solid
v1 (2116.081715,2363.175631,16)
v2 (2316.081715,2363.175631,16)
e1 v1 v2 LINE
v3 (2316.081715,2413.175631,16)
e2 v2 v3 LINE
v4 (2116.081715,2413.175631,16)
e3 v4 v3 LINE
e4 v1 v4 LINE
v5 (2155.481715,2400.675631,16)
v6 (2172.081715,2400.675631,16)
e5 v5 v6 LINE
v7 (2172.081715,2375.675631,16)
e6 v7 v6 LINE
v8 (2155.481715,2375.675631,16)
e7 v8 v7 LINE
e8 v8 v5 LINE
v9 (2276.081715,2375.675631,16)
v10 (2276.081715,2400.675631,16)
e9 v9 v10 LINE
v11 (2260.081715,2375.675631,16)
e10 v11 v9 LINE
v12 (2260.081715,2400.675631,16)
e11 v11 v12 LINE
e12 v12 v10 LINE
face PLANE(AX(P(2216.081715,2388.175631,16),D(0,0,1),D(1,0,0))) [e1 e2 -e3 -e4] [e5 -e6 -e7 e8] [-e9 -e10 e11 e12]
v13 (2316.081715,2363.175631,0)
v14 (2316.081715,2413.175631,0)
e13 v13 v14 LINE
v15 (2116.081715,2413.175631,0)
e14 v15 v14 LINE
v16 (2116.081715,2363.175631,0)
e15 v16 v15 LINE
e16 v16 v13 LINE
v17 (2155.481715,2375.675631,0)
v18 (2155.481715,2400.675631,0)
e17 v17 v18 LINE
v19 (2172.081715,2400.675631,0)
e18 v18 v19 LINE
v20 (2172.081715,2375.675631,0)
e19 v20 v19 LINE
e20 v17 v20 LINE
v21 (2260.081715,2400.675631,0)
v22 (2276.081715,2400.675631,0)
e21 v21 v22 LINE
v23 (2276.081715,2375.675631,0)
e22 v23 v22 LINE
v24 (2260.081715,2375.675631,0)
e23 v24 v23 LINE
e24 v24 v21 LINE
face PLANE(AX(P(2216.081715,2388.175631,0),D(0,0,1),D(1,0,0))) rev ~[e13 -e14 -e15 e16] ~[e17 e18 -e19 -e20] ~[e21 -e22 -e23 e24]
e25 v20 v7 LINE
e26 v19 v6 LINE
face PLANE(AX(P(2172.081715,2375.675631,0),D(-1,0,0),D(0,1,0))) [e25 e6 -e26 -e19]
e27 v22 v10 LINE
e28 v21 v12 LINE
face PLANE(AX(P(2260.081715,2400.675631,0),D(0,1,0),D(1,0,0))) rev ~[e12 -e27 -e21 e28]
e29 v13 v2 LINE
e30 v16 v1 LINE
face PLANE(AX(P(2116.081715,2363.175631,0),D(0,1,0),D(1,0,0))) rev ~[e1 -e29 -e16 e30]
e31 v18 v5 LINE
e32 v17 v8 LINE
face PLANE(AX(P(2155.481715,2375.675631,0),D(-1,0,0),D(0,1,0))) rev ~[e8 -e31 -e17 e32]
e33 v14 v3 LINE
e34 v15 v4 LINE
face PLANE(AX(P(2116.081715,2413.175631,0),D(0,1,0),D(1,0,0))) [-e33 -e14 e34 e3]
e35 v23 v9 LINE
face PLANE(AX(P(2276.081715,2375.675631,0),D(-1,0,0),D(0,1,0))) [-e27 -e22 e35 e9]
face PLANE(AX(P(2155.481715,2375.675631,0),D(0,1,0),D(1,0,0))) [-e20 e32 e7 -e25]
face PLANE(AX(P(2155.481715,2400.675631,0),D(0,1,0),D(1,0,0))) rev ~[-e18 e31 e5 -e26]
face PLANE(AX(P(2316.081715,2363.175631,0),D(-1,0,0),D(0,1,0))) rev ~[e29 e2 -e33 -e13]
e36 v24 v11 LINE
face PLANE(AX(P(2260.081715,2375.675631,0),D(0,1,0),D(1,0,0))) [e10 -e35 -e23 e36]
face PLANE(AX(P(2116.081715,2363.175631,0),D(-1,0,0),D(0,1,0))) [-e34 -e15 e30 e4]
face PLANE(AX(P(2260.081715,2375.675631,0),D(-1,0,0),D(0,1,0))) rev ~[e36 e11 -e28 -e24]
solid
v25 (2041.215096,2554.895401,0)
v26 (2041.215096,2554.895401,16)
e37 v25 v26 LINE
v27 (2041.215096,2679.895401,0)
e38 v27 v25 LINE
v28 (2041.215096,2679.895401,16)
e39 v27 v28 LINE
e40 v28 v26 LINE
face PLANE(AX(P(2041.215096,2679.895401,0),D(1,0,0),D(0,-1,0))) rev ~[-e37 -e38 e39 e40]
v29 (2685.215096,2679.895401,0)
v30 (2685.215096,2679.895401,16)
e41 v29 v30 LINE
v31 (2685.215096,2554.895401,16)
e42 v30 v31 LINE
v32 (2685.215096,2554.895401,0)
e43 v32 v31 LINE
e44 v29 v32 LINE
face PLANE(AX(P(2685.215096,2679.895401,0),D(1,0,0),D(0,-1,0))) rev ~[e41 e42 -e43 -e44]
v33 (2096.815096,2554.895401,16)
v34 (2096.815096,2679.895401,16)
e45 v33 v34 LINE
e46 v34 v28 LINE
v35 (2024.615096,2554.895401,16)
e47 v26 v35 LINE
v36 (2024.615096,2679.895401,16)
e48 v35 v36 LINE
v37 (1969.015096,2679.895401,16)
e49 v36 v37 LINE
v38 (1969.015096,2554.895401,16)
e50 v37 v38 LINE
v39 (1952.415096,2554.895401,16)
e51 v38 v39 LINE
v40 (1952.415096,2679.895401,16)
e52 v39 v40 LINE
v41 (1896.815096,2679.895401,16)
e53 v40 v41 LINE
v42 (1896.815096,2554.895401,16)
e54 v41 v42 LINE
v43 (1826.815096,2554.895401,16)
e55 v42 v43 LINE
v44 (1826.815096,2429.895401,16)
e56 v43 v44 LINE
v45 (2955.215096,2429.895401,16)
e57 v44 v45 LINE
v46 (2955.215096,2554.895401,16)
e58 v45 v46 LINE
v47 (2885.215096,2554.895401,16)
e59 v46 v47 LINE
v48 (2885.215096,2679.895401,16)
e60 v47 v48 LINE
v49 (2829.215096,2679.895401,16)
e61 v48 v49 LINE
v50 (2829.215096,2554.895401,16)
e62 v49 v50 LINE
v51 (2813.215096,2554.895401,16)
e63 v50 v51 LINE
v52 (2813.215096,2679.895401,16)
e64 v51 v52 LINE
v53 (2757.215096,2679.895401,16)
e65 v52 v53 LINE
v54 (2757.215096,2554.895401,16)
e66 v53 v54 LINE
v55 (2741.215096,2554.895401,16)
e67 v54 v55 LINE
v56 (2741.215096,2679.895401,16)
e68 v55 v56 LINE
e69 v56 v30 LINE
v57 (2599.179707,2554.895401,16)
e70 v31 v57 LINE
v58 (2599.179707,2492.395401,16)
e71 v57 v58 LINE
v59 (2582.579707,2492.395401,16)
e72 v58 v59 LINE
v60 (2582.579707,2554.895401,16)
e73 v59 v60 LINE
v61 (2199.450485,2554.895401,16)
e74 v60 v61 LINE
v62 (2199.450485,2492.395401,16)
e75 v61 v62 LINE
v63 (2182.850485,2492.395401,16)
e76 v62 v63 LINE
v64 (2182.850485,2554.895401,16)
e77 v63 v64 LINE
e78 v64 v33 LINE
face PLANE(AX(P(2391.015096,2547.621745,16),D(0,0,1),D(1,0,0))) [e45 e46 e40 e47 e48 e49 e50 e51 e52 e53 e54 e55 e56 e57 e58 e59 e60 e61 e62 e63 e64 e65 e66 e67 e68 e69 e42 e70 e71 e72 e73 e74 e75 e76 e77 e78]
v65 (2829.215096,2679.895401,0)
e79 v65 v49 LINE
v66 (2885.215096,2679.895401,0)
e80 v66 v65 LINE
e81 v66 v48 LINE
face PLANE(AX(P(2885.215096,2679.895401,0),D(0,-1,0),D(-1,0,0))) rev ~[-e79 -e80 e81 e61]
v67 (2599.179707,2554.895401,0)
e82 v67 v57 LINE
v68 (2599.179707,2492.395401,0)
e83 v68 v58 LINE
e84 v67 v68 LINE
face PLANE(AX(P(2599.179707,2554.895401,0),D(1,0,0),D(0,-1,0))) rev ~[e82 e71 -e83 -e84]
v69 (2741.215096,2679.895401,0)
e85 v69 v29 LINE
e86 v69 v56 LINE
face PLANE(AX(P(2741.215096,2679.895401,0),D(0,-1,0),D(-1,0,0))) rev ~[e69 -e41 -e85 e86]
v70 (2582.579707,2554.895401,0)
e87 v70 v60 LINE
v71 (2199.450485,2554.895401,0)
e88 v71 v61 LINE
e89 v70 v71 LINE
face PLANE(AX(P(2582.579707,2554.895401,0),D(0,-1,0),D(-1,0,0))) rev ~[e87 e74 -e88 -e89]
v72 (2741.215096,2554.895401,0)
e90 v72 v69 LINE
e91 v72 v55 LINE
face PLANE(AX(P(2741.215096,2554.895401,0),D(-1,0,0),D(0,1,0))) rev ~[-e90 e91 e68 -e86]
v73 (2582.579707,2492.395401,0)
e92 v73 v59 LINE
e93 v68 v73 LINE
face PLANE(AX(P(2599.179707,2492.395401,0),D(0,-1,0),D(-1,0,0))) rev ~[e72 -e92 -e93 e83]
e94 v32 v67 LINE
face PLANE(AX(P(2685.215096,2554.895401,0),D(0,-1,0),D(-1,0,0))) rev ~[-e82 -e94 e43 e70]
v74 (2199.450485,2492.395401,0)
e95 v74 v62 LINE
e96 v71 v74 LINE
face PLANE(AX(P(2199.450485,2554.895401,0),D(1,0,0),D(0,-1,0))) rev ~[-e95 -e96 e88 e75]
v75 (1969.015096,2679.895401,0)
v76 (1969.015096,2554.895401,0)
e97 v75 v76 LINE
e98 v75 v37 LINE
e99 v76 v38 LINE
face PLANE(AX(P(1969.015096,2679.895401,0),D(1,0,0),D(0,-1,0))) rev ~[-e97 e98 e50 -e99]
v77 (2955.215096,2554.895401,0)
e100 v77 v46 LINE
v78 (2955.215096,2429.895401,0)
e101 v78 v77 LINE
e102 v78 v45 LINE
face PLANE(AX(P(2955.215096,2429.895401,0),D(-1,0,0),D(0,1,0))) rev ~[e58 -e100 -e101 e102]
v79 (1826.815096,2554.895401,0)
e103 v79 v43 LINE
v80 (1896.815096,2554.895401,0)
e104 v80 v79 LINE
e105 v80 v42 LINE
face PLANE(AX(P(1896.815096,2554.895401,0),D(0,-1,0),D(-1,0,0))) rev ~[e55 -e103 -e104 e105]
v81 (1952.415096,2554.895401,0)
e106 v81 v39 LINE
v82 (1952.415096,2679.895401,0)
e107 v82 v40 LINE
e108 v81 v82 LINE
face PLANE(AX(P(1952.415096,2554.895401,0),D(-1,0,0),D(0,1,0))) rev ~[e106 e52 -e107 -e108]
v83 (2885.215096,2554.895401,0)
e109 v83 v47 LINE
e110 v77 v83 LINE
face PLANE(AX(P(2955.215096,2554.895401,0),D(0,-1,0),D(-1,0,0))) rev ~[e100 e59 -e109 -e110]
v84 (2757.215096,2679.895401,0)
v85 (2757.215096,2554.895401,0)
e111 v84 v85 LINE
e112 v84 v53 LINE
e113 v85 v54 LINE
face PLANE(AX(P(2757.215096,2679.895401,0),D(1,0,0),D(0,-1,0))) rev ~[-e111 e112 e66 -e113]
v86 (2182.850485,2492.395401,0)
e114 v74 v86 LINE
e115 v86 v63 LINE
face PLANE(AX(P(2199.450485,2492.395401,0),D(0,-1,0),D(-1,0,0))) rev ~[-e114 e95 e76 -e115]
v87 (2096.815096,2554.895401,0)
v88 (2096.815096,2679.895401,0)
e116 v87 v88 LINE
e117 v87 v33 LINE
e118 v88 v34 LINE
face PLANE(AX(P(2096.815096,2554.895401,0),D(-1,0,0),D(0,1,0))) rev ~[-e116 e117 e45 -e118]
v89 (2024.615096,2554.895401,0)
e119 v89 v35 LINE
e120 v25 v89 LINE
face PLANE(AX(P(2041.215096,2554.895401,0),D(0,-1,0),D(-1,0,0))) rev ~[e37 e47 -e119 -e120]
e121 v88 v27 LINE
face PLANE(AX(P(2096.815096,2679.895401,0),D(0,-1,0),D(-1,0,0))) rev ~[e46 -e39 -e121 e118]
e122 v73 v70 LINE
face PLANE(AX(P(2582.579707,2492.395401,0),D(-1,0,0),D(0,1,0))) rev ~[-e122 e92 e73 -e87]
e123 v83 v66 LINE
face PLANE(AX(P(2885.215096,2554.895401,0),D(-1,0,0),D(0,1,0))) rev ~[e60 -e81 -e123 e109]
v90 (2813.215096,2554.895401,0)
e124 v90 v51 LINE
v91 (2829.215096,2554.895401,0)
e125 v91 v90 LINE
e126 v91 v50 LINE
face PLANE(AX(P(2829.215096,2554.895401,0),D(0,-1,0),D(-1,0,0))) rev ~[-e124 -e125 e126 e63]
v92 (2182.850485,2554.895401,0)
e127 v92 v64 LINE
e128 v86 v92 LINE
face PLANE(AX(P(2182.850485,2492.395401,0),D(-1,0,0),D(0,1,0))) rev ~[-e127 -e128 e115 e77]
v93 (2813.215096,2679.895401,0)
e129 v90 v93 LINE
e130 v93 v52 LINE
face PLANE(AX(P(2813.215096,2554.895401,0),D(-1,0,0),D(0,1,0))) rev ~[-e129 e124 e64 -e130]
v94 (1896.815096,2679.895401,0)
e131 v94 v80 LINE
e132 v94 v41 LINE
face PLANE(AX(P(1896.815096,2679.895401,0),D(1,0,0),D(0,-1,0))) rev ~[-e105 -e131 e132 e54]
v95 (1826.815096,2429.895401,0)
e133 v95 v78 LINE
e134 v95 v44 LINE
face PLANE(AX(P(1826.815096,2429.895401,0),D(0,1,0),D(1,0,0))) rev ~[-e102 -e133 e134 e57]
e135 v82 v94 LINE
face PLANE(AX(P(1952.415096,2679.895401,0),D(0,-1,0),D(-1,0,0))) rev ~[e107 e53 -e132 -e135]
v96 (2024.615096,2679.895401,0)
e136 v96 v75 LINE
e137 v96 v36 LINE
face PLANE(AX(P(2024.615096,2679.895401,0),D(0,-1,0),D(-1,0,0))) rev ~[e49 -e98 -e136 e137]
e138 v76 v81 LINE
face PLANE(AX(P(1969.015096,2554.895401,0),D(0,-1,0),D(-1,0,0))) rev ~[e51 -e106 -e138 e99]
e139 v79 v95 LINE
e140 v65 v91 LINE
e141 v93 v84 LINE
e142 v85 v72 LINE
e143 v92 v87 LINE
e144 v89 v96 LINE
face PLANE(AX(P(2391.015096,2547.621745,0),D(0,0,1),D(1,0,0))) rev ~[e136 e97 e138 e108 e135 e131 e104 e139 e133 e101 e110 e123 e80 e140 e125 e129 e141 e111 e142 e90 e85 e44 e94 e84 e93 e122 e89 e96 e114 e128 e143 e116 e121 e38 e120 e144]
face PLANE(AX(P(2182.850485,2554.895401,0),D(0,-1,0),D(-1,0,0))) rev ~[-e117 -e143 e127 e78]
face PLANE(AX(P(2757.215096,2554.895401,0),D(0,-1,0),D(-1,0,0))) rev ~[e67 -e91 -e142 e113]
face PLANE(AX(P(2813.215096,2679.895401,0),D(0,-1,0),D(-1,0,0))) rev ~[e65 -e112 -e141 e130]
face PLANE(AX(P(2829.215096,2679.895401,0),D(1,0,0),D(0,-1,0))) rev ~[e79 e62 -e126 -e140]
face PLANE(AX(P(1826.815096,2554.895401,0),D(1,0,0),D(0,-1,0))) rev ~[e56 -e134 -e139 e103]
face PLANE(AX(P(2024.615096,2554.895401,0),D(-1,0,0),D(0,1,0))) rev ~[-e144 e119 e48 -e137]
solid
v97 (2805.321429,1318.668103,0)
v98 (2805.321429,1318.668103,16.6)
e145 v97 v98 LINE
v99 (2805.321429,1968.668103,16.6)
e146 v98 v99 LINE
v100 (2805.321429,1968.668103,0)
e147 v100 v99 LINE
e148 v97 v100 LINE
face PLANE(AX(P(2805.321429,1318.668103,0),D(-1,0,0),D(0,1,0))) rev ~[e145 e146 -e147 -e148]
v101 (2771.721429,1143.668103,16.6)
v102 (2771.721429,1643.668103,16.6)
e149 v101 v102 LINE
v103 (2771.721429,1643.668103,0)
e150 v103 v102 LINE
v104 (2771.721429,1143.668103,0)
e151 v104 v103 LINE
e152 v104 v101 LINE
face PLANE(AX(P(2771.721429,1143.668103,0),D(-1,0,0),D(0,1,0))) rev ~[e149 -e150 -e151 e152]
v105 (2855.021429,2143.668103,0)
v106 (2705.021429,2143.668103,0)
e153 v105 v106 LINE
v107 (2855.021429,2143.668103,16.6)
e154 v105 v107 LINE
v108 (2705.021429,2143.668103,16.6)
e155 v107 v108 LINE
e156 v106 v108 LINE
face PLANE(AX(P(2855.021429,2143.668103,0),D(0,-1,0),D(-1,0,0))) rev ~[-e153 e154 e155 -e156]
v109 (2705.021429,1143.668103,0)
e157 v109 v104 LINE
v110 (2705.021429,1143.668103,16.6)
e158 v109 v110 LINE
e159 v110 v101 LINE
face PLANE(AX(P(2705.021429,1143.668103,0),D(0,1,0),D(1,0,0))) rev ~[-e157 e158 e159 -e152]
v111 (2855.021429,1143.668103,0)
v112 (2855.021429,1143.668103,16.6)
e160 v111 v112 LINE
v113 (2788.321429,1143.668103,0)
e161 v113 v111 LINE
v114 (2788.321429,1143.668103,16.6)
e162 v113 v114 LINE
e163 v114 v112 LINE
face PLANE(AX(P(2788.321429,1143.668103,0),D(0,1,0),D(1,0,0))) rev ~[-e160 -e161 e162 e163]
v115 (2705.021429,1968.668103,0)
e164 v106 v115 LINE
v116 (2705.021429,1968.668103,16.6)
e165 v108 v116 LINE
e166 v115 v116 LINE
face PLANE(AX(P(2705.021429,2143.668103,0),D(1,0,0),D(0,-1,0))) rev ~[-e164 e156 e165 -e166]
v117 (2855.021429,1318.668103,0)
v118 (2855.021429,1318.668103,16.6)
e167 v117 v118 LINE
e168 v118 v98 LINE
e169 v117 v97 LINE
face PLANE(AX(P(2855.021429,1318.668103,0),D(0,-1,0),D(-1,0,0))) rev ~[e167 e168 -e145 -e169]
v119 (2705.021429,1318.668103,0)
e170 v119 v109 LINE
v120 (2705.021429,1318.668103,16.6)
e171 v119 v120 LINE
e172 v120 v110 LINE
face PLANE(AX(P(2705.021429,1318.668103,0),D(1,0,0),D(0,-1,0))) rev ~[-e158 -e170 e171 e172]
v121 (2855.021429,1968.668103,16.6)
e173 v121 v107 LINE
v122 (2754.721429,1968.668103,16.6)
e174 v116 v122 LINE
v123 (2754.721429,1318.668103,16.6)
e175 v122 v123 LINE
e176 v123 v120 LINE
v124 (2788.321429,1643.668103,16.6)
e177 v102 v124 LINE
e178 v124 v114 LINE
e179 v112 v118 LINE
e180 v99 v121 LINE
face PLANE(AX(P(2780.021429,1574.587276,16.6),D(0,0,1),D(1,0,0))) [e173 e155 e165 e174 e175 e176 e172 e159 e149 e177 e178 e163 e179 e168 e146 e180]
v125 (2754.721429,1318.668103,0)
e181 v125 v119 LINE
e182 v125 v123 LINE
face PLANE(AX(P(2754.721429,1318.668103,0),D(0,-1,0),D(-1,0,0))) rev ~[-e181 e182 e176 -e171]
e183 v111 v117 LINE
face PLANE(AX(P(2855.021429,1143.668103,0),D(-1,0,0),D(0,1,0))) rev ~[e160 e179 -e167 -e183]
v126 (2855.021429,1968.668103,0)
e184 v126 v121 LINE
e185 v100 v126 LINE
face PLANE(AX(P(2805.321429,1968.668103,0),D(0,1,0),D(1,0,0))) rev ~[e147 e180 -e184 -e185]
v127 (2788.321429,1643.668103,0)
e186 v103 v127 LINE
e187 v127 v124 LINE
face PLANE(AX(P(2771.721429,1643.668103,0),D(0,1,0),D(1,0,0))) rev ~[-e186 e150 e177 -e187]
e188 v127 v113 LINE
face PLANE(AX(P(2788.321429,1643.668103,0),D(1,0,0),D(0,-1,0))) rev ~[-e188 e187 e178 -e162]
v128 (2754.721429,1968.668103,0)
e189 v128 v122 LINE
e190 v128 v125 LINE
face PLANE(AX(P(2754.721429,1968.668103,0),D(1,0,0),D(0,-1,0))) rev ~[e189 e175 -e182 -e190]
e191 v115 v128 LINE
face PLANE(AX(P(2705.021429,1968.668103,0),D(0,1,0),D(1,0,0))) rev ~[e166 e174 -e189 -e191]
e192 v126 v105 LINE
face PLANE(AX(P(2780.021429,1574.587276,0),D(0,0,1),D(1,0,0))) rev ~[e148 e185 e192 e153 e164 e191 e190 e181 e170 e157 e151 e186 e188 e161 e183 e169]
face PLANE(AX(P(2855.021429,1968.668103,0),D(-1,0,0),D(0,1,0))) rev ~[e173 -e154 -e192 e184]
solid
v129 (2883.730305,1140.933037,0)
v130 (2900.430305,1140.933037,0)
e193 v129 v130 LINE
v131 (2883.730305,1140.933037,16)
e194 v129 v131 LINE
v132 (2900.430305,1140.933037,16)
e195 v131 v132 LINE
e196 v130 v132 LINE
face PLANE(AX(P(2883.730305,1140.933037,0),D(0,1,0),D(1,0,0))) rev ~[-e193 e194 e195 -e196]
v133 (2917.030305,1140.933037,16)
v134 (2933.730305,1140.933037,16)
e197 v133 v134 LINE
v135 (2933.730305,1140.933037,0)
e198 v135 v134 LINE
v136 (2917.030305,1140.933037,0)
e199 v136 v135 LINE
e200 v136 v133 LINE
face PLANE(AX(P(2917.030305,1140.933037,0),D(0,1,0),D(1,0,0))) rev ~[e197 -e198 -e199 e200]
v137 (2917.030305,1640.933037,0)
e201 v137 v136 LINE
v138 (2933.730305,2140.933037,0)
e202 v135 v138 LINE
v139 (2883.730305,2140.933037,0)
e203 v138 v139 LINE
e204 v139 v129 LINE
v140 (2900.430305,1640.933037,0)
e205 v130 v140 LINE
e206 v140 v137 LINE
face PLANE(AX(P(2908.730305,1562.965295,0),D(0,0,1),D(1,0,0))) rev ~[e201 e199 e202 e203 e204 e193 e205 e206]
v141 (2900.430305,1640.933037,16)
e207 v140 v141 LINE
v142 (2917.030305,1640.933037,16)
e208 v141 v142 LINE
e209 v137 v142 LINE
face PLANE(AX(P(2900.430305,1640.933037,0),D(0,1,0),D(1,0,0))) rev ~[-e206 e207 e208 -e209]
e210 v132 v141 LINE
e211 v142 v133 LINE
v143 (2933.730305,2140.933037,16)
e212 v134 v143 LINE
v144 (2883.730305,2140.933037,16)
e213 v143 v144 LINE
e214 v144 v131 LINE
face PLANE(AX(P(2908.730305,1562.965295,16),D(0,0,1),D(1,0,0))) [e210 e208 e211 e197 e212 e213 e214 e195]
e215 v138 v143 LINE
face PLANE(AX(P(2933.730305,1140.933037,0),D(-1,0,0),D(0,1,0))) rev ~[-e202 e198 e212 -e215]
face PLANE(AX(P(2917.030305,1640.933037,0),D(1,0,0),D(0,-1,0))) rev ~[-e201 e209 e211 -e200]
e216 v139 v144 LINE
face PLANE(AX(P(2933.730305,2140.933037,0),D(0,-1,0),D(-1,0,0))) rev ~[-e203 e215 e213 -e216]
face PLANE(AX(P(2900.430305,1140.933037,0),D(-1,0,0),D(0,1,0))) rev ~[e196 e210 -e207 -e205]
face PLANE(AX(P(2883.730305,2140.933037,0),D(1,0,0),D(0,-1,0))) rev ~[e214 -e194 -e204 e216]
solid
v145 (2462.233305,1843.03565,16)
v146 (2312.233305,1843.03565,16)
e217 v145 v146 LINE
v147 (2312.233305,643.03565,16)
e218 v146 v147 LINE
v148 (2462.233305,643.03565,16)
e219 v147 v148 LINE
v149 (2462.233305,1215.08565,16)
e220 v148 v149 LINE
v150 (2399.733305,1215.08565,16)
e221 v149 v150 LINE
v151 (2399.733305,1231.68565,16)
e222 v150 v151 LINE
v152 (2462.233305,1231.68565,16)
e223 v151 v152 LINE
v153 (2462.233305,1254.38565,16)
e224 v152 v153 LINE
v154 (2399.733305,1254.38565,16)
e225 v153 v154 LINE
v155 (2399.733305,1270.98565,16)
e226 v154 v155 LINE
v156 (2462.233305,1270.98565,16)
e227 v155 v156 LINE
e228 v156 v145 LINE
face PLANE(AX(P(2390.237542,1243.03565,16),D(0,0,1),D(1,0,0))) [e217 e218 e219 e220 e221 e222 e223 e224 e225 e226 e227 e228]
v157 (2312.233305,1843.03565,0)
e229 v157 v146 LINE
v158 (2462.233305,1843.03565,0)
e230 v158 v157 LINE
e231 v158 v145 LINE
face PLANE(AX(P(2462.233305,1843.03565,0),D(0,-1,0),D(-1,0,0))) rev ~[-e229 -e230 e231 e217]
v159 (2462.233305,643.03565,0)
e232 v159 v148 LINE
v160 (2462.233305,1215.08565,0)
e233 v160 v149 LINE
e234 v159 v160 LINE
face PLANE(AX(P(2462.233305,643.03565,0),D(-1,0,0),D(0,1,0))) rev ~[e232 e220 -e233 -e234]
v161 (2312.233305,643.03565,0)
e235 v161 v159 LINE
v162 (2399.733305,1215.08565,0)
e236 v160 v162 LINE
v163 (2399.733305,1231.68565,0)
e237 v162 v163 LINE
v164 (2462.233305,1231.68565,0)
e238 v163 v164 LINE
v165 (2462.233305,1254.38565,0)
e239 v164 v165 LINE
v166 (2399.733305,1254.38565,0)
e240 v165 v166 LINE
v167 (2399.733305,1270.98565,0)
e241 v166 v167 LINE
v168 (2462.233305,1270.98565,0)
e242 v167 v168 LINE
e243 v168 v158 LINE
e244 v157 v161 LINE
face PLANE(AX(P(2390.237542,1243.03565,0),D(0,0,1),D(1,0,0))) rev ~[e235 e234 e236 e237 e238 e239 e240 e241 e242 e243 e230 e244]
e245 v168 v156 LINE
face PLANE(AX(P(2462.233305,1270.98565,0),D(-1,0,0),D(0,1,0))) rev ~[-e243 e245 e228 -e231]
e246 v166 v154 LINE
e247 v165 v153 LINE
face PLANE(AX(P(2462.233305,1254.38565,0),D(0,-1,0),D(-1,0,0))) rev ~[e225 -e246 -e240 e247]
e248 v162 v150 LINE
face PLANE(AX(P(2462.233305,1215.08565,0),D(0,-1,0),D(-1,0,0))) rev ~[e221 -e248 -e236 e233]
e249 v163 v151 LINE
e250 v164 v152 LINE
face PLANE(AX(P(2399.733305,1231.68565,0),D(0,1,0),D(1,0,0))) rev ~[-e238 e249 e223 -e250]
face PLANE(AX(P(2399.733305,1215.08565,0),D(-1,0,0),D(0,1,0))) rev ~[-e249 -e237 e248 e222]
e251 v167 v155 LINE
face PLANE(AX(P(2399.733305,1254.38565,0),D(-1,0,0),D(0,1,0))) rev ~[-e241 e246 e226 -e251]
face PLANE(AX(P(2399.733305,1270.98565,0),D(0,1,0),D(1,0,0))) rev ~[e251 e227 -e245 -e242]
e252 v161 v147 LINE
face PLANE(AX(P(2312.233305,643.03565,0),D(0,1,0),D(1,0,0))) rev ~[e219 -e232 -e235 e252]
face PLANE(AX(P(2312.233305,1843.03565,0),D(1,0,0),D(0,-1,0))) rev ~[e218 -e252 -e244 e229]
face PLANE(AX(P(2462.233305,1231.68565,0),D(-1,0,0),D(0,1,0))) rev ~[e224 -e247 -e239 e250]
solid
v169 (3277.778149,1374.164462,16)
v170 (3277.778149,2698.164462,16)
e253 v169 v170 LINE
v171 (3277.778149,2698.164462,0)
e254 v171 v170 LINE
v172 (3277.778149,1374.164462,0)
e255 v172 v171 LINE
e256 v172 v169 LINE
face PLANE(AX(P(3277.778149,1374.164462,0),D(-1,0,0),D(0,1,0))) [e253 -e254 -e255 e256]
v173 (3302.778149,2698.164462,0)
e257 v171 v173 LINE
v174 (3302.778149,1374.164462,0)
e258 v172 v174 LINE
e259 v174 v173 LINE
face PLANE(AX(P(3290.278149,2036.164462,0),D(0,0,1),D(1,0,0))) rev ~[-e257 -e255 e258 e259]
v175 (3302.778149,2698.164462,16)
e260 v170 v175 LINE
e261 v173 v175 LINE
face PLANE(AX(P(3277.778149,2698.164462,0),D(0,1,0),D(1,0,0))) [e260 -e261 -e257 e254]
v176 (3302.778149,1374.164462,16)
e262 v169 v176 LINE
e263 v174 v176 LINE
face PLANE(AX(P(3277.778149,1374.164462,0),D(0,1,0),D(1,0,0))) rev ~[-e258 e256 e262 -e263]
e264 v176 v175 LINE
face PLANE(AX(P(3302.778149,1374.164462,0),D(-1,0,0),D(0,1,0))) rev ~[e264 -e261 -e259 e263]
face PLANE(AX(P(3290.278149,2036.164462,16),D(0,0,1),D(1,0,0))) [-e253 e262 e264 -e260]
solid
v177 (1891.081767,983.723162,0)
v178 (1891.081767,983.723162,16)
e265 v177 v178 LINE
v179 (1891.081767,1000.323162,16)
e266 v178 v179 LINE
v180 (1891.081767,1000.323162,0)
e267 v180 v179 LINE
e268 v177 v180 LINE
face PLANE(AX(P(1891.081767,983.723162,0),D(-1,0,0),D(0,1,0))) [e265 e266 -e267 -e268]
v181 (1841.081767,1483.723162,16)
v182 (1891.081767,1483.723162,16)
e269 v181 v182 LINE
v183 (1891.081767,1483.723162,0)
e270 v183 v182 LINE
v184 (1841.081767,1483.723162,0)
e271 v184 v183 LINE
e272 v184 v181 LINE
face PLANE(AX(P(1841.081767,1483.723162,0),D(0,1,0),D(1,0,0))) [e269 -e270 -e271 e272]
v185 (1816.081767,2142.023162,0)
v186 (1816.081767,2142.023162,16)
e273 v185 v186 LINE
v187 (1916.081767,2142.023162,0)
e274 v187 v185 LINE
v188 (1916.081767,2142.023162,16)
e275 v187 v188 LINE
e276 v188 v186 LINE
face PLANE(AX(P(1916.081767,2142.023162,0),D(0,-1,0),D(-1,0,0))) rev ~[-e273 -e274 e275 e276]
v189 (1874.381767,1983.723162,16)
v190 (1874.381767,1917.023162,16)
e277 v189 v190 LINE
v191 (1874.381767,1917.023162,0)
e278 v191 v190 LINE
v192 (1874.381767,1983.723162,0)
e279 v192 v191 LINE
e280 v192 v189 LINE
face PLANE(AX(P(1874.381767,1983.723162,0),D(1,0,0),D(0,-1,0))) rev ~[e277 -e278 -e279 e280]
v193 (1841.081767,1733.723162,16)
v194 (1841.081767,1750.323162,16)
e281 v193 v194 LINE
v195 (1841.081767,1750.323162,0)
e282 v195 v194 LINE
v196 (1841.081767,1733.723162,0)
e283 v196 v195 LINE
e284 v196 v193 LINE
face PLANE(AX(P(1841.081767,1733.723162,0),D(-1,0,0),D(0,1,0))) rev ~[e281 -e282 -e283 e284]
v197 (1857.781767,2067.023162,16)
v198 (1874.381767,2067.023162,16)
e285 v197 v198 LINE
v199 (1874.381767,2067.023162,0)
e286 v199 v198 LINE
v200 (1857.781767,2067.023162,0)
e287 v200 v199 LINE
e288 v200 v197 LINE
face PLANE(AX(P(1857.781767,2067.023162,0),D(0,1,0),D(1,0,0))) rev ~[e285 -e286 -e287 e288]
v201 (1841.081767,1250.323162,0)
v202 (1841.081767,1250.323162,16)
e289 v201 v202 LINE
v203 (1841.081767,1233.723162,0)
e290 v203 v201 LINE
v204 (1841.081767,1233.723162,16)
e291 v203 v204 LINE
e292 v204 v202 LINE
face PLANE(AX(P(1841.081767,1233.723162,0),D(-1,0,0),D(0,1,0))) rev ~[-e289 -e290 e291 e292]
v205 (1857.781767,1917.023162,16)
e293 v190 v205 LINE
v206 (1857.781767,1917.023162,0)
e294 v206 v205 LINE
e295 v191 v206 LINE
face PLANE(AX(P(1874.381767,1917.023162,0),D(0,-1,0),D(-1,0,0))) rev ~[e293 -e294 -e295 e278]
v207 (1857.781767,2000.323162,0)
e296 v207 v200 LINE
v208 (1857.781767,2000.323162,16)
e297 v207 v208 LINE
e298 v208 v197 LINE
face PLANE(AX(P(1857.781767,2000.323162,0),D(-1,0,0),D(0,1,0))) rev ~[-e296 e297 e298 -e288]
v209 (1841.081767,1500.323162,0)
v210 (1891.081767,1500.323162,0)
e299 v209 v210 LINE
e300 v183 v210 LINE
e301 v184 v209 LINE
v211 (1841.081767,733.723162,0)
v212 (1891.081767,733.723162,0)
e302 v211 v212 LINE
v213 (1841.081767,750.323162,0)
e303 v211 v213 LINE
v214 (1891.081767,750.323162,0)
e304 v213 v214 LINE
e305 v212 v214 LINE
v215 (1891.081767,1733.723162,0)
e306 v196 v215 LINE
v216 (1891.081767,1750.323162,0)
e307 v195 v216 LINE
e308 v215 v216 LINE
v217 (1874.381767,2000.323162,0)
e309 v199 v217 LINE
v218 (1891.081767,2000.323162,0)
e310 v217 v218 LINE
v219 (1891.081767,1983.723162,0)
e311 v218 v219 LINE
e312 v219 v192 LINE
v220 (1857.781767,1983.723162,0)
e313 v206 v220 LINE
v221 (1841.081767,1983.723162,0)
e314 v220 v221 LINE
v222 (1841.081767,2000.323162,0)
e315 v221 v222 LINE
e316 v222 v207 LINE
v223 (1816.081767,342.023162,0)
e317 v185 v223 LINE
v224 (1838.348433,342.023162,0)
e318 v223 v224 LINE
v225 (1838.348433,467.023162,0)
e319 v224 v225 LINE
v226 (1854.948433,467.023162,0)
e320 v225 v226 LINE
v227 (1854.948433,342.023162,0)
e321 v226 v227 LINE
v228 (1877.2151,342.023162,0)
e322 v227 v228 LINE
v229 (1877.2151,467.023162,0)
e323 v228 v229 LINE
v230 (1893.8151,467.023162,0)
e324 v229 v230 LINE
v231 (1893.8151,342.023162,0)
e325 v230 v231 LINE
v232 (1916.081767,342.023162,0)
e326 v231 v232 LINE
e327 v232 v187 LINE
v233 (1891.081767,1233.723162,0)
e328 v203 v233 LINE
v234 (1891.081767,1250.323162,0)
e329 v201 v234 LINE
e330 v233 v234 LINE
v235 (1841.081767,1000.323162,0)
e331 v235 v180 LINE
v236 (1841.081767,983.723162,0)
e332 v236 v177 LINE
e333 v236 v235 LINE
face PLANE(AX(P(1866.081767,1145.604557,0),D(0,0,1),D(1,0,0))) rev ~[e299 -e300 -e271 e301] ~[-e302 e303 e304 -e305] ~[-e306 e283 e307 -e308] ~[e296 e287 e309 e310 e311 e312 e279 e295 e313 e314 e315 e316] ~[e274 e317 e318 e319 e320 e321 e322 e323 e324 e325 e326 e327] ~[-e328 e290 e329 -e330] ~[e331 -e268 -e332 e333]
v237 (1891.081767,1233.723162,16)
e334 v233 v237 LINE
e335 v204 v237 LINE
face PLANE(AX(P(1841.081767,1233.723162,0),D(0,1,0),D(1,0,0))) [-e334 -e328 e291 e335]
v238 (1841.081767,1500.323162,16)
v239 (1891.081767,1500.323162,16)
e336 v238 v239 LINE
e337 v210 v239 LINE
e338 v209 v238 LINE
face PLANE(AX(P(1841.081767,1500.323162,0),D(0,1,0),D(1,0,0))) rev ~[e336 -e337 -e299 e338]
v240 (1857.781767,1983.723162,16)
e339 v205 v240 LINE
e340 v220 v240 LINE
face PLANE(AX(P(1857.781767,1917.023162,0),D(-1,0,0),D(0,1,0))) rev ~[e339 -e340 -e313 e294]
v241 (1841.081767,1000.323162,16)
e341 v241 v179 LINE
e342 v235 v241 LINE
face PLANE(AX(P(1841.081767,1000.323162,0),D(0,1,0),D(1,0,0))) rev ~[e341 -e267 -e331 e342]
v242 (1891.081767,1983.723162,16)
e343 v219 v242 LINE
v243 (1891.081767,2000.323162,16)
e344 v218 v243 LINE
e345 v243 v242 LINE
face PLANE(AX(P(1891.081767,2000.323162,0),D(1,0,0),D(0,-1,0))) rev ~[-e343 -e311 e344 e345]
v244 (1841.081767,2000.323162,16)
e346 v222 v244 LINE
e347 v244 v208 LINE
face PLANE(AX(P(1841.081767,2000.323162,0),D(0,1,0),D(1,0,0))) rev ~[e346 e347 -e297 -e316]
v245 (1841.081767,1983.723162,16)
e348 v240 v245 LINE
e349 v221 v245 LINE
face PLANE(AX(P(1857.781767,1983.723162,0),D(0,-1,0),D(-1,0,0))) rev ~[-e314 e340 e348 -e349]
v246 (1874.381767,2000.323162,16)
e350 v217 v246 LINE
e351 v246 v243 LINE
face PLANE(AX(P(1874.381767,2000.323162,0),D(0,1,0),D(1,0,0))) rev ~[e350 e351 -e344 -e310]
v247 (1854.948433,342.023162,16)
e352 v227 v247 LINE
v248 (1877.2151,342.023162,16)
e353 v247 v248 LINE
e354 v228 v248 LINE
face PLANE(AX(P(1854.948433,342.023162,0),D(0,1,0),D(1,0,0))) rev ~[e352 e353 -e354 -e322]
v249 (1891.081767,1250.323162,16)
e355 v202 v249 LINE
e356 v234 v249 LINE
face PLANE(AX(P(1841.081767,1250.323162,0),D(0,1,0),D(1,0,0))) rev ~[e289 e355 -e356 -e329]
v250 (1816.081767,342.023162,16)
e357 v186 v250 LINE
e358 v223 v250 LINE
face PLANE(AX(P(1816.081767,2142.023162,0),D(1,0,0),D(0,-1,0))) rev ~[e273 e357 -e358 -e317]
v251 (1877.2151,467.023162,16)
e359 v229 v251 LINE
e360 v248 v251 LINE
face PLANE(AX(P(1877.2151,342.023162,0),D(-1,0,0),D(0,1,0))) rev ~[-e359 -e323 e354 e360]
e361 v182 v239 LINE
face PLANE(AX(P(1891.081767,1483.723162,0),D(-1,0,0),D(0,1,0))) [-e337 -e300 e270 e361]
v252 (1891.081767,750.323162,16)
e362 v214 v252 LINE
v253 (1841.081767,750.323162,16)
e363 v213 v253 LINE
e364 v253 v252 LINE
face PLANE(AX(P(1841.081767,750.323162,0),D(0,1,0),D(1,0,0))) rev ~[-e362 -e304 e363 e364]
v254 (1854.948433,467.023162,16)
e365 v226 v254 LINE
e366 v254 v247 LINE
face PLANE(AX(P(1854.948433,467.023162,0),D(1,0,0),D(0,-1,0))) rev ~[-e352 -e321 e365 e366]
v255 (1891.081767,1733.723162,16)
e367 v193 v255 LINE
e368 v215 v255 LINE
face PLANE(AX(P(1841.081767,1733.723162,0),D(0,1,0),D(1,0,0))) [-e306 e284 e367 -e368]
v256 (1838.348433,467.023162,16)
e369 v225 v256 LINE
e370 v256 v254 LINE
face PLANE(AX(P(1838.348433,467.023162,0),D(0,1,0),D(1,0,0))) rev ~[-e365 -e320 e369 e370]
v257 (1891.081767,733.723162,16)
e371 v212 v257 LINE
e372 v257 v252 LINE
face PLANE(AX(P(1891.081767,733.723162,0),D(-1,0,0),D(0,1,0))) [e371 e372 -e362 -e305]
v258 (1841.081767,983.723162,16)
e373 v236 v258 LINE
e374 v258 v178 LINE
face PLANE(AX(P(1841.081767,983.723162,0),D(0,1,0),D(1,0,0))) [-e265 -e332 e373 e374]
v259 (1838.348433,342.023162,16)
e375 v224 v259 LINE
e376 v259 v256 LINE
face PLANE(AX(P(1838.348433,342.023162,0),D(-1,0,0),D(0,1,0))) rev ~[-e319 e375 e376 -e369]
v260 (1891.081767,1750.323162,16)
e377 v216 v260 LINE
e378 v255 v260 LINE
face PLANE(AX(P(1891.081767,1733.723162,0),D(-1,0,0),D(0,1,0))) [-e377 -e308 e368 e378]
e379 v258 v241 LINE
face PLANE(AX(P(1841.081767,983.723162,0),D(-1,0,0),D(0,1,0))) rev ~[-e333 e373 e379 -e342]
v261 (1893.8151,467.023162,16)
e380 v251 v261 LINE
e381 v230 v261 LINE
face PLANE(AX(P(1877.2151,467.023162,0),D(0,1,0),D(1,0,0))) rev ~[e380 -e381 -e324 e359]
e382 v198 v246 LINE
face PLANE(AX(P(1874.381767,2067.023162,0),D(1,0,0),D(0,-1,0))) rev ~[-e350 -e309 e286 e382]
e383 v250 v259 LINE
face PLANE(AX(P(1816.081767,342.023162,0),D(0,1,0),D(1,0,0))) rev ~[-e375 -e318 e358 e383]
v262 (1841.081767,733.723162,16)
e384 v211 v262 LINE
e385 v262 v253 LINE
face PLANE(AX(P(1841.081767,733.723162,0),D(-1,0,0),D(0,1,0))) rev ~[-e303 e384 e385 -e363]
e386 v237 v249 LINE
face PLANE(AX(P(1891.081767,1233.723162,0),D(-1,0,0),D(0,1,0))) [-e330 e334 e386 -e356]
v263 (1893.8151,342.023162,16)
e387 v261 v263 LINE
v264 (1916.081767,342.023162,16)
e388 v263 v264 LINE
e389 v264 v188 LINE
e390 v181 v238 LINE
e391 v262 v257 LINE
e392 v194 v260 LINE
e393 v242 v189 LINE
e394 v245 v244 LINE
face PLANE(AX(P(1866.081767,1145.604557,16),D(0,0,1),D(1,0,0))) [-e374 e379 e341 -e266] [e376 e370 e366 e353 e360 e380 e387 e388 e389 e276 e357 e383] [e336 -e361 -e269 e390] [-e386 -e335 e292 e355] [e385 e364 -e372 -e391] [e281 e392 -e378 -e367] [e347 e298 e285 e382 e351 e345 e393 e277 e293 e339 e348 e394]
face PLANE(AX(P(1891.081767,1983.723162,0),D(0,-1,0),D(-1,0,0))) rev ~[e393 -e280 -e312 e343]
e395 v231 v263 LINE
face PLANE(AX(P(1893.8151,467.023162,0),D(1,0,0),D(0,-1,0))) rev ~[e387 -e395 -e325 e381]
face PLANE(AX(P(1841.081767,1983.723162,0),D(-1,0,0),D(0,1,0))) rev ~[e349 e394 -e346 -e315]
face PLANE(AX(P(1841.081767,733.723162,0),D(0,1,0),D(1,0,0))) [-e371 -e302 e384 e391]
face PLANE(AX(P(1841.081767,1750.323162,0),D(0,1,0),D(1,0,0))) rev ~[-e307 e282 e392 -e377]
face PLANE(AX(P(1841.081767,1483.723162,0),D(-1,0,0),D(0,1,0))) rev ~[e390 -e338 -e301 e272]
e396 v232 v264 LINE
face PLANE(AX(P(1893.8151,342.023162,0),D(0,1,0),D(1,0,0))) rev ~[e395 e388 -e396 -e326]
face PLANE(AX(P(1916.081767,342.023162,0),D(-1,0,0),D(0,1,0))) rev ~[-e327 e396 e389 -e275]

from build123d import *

# Parameters (mm, degrees)
F2_DEPTH = 16
F1_W     = 200
F1_H     = 50
F1_W_2   = 16.6
F1_H_2   = 25
F1_W_3   = 16
F1_W_4   = 50
F1_H_3   = 16.6
F3_DEPTH = 16.6
F1_W_5   = 25
F1_H_4   = 1324
F4_DEPTH = 16


# Not quite as in the source:
# - a feature names something its author has since deleted; it is built from what else it names


with BuildPart() as f2:
    # F1 (on Top) → F2 (new body)
    with BuildSketch(Plane.XY):
        Polygon((1826.8150956472, 2554.895401001), (1826.8150956472, 2429.895401001), (2955.2150956472, 2429.895401001), (2955.2150956472, 2554.895401001), (2885.2150956472, 2554.895401001), (2885.2150956472, 2679.895401001), (2829.2150956472, 2679.895401001), (2829.2150956472, 2554.895401001), (2813.2150956472, 2554.895401001), (2813.2150956472, 2679.895401001), (2757.2150956472, 2679.895401001), (2757.2150956472, 2554.895401001), (2741.2150956472, 2554.895401001), (2741.2150956472, 2679.895401001), (2685.2150956472, 2679.895401001), (2685.2150956472, 2554.895401001), (2599.1797067006, 2554.895401001), (2599.1797067006, 2492.395401001), (2582.5797067006, 2492.395401001), (2582.5797067006, 2554.895401001), (2199.4504845937, 2554.895401001), (2199.4504845937, 2492.395401001), (2182.8504845937, 2492.395401001), (2182.8504845937, 2554.895401001), (2096.8150956472, 2554.895401001), (2096.8150956472, 2679.895401001), (2041.2150956472, 2679.895401001), (2041.2150956472, 2554.895401001), (2024.6150956472, 2554.895401001), (2024.6150956472, 2679.895401001), (1969.0150956472, 2679.895401001), (1969.0150956472, 2554.895401001), (1952.4150956472, 2554.895401001), (1952.4150956472, 2679.895401001), (1896.8150956472, 2679.895401001), (1896.8150956472, 2554.895401001), align=None)
    extrude(amount=F2_DEPTH)


with BuildPart() as f2b:
    # F1 (on Top) → F2, piece 2 (new body)
    with BuildSketch(Plane.XY):
        with Locations((2216.0817146301, 2388.1756305695)):
            Rectangle(F1_W, F1_H)
        with Locations((2163.7817146301, 2388.1756305695)):
            Rectangle(F1_W_2, F1_H_2, mode=Mode.SUBTRACT)
        with Locations((2268.0817146301, 2388.1756305695)):
            Rectangle(F1_W_3, F1_H_2, mode=Mode.SUBTRACT)
    extrude(amount=F2_DEPTH)


with BuildPart() as f2c:
    # F1 (on Top) → F2, piece 3 (new body)
    with BuildSketch(Plane.XY):
        Polygon((2917.0303050995, 1140.9330368042), (2933.7303050995, 1140.9330368042), (2933.7303050995, 2140.9330368042), (2883.7303050995, 2140.9330368042), (2883.7303050995, 1140.9330368042), (2900.4303050995, 1140.9330368042), (2900.4303050995, 1640.9330368042), (2917.0303050995, 1640.9330368042), align=None)
    extrude(amount=F2_DEPTH)


with BuildPart() as f2d:
    # F1 (on Top) → F2, piece 4 (new body)
    with BuildSketch(Plane.XY):
        Polygon((1916.0817667643, 2142.0231616099), (1816.0817667643, 2142.0231616099), (1816.0817667643, 342.0231616099), (1838.348433431, 342.0231616099), (1838.348433431, 467.0231616099), (1854.948433431, 467.0231616099), (1854.948433431, 342.0231616099), (1877.2151000977, 342.0231616099), (1877.2151000977, 467.0231616099), (1893.8151000977, 467.0231616099), (1893.8151000977, 342.0231616099), (1916.0817667643, 342.0231616099), align=None)
        with Locations((1866.0817667643, 742.0231616099)):
            Rectangle(F1_W_4, F1_H_3, mode=Mode.SUBTRACT)
        with Locations((1866.0817667643, 992.0231616099)):
            Rectangle(F1_W_4, F1_H_3, mode=Mode.SUBTRACT)
        with Locations((1866.0817667643, 1242.0231616099)):
            Rectangle(F1_W_4, F1_H_3, mode=Mode.SUBTRACT)
        with Locations((1866.0817667643, 1492.0231616099)):
            Rectangle(F1_W_4, F1_H_3, mode=Mode.SUBTRACT)
        with Locations((1866.0817667643, 1742.0231616099)):
            Rectangle(F1_W_4, F1_H_3, mode=Mode.SUBTRACT)
        Polygon((1874.3817667643, 2000.3231616099), (1891.0817667643, 2000.3231616099), (1891.0817667643, 1983.7231616099), (1874.3817667643, 1983.7231616099), (1874.3817667643, 1917.0231616099), (1857.7817667643, 1917.0231616099), (1857.7817667643, 1983.7231616099), (1841.0817667643, 1983.7231616099), (1841.0817667643, 2000.3231616099), (1857.7817667643, 2000.3231616099), (1857.7817667643, 2067.0231616099), (1874.3817667643, 2067.0231616099), align=None, mode=Mode.SUBTRACT)
    extrude(amount=F2_DEPTH)


with BuildPart() as f2e:
    # F1 (on Top) → F2, piece 5 (new body)
    with BuildSketch(Plane.XY):
        Polygon((2312.2333049774, 1843.0356502533), (2312.2333049774, 643.0356502533), (2462.2333049774, 643.0356502533), (2462.2333049774, 1215.0856502533), (2399.7333049774, 1215.0856502533), (2399.7333049774, 1231.6856502533), (2462.2333049774, 1231.6856502533), (2462.2333049774, 1254.3856502533), (2399.7333049774, 1254.3856502533), (2399.7333049774, 1270.9856502533), (2462.2333049774, 1270.9856502533), (2462.2333049774, 1843.0356502533), align=None)
    extrude(amount=F2_DEPTH)


with BuildPart() as f3:
    # F1 (on Top) → F3 (new body)
    with BuildSketch(Plane.XY):
        Polygon((2855.0214290619, 1968.6681032181), (2855.0214290619, 2143.6681032181), (2705.0214290619, 2143.6681032181), (2705.0214290619, 1968.6681032181), (2754.7214290619, 1968.6681032181), (2754.7214290619, 1318.6681032181), (2705.0214290619, 1318.6681032181), (2705.0214290619, 1143.6681032181), (2771.7214290619, 1143.6681032181), (2771.7214290619, 1643.6681032181), (2788.3214290619, 1643.6681032181), (2788.3214290619, 1143.6681032181), (2855.0214290619, 1143.6681032181), (2855.0214290619, 1318.6681032181), (2805.3214290619, 1318.6681032181), (2805.3214290619, 1968.6681032181), align=None)
    extrude(amount=F3_DEPTH)


with BuildPart() as f4:
    # F1 (on Top) → F4 (new body)
    with BuildSketch(Plane.XY):
        with Locations((3290.2781486511, 2036.1644620895)):
            Rectangle(F1_W_5, F1_H_4)
    extrude(amount=F4_DEPTH)


solid = Compound([f2.part, f2b.part, f2c.part, f2d.part, f2e.part, f3.part, f4.part])
